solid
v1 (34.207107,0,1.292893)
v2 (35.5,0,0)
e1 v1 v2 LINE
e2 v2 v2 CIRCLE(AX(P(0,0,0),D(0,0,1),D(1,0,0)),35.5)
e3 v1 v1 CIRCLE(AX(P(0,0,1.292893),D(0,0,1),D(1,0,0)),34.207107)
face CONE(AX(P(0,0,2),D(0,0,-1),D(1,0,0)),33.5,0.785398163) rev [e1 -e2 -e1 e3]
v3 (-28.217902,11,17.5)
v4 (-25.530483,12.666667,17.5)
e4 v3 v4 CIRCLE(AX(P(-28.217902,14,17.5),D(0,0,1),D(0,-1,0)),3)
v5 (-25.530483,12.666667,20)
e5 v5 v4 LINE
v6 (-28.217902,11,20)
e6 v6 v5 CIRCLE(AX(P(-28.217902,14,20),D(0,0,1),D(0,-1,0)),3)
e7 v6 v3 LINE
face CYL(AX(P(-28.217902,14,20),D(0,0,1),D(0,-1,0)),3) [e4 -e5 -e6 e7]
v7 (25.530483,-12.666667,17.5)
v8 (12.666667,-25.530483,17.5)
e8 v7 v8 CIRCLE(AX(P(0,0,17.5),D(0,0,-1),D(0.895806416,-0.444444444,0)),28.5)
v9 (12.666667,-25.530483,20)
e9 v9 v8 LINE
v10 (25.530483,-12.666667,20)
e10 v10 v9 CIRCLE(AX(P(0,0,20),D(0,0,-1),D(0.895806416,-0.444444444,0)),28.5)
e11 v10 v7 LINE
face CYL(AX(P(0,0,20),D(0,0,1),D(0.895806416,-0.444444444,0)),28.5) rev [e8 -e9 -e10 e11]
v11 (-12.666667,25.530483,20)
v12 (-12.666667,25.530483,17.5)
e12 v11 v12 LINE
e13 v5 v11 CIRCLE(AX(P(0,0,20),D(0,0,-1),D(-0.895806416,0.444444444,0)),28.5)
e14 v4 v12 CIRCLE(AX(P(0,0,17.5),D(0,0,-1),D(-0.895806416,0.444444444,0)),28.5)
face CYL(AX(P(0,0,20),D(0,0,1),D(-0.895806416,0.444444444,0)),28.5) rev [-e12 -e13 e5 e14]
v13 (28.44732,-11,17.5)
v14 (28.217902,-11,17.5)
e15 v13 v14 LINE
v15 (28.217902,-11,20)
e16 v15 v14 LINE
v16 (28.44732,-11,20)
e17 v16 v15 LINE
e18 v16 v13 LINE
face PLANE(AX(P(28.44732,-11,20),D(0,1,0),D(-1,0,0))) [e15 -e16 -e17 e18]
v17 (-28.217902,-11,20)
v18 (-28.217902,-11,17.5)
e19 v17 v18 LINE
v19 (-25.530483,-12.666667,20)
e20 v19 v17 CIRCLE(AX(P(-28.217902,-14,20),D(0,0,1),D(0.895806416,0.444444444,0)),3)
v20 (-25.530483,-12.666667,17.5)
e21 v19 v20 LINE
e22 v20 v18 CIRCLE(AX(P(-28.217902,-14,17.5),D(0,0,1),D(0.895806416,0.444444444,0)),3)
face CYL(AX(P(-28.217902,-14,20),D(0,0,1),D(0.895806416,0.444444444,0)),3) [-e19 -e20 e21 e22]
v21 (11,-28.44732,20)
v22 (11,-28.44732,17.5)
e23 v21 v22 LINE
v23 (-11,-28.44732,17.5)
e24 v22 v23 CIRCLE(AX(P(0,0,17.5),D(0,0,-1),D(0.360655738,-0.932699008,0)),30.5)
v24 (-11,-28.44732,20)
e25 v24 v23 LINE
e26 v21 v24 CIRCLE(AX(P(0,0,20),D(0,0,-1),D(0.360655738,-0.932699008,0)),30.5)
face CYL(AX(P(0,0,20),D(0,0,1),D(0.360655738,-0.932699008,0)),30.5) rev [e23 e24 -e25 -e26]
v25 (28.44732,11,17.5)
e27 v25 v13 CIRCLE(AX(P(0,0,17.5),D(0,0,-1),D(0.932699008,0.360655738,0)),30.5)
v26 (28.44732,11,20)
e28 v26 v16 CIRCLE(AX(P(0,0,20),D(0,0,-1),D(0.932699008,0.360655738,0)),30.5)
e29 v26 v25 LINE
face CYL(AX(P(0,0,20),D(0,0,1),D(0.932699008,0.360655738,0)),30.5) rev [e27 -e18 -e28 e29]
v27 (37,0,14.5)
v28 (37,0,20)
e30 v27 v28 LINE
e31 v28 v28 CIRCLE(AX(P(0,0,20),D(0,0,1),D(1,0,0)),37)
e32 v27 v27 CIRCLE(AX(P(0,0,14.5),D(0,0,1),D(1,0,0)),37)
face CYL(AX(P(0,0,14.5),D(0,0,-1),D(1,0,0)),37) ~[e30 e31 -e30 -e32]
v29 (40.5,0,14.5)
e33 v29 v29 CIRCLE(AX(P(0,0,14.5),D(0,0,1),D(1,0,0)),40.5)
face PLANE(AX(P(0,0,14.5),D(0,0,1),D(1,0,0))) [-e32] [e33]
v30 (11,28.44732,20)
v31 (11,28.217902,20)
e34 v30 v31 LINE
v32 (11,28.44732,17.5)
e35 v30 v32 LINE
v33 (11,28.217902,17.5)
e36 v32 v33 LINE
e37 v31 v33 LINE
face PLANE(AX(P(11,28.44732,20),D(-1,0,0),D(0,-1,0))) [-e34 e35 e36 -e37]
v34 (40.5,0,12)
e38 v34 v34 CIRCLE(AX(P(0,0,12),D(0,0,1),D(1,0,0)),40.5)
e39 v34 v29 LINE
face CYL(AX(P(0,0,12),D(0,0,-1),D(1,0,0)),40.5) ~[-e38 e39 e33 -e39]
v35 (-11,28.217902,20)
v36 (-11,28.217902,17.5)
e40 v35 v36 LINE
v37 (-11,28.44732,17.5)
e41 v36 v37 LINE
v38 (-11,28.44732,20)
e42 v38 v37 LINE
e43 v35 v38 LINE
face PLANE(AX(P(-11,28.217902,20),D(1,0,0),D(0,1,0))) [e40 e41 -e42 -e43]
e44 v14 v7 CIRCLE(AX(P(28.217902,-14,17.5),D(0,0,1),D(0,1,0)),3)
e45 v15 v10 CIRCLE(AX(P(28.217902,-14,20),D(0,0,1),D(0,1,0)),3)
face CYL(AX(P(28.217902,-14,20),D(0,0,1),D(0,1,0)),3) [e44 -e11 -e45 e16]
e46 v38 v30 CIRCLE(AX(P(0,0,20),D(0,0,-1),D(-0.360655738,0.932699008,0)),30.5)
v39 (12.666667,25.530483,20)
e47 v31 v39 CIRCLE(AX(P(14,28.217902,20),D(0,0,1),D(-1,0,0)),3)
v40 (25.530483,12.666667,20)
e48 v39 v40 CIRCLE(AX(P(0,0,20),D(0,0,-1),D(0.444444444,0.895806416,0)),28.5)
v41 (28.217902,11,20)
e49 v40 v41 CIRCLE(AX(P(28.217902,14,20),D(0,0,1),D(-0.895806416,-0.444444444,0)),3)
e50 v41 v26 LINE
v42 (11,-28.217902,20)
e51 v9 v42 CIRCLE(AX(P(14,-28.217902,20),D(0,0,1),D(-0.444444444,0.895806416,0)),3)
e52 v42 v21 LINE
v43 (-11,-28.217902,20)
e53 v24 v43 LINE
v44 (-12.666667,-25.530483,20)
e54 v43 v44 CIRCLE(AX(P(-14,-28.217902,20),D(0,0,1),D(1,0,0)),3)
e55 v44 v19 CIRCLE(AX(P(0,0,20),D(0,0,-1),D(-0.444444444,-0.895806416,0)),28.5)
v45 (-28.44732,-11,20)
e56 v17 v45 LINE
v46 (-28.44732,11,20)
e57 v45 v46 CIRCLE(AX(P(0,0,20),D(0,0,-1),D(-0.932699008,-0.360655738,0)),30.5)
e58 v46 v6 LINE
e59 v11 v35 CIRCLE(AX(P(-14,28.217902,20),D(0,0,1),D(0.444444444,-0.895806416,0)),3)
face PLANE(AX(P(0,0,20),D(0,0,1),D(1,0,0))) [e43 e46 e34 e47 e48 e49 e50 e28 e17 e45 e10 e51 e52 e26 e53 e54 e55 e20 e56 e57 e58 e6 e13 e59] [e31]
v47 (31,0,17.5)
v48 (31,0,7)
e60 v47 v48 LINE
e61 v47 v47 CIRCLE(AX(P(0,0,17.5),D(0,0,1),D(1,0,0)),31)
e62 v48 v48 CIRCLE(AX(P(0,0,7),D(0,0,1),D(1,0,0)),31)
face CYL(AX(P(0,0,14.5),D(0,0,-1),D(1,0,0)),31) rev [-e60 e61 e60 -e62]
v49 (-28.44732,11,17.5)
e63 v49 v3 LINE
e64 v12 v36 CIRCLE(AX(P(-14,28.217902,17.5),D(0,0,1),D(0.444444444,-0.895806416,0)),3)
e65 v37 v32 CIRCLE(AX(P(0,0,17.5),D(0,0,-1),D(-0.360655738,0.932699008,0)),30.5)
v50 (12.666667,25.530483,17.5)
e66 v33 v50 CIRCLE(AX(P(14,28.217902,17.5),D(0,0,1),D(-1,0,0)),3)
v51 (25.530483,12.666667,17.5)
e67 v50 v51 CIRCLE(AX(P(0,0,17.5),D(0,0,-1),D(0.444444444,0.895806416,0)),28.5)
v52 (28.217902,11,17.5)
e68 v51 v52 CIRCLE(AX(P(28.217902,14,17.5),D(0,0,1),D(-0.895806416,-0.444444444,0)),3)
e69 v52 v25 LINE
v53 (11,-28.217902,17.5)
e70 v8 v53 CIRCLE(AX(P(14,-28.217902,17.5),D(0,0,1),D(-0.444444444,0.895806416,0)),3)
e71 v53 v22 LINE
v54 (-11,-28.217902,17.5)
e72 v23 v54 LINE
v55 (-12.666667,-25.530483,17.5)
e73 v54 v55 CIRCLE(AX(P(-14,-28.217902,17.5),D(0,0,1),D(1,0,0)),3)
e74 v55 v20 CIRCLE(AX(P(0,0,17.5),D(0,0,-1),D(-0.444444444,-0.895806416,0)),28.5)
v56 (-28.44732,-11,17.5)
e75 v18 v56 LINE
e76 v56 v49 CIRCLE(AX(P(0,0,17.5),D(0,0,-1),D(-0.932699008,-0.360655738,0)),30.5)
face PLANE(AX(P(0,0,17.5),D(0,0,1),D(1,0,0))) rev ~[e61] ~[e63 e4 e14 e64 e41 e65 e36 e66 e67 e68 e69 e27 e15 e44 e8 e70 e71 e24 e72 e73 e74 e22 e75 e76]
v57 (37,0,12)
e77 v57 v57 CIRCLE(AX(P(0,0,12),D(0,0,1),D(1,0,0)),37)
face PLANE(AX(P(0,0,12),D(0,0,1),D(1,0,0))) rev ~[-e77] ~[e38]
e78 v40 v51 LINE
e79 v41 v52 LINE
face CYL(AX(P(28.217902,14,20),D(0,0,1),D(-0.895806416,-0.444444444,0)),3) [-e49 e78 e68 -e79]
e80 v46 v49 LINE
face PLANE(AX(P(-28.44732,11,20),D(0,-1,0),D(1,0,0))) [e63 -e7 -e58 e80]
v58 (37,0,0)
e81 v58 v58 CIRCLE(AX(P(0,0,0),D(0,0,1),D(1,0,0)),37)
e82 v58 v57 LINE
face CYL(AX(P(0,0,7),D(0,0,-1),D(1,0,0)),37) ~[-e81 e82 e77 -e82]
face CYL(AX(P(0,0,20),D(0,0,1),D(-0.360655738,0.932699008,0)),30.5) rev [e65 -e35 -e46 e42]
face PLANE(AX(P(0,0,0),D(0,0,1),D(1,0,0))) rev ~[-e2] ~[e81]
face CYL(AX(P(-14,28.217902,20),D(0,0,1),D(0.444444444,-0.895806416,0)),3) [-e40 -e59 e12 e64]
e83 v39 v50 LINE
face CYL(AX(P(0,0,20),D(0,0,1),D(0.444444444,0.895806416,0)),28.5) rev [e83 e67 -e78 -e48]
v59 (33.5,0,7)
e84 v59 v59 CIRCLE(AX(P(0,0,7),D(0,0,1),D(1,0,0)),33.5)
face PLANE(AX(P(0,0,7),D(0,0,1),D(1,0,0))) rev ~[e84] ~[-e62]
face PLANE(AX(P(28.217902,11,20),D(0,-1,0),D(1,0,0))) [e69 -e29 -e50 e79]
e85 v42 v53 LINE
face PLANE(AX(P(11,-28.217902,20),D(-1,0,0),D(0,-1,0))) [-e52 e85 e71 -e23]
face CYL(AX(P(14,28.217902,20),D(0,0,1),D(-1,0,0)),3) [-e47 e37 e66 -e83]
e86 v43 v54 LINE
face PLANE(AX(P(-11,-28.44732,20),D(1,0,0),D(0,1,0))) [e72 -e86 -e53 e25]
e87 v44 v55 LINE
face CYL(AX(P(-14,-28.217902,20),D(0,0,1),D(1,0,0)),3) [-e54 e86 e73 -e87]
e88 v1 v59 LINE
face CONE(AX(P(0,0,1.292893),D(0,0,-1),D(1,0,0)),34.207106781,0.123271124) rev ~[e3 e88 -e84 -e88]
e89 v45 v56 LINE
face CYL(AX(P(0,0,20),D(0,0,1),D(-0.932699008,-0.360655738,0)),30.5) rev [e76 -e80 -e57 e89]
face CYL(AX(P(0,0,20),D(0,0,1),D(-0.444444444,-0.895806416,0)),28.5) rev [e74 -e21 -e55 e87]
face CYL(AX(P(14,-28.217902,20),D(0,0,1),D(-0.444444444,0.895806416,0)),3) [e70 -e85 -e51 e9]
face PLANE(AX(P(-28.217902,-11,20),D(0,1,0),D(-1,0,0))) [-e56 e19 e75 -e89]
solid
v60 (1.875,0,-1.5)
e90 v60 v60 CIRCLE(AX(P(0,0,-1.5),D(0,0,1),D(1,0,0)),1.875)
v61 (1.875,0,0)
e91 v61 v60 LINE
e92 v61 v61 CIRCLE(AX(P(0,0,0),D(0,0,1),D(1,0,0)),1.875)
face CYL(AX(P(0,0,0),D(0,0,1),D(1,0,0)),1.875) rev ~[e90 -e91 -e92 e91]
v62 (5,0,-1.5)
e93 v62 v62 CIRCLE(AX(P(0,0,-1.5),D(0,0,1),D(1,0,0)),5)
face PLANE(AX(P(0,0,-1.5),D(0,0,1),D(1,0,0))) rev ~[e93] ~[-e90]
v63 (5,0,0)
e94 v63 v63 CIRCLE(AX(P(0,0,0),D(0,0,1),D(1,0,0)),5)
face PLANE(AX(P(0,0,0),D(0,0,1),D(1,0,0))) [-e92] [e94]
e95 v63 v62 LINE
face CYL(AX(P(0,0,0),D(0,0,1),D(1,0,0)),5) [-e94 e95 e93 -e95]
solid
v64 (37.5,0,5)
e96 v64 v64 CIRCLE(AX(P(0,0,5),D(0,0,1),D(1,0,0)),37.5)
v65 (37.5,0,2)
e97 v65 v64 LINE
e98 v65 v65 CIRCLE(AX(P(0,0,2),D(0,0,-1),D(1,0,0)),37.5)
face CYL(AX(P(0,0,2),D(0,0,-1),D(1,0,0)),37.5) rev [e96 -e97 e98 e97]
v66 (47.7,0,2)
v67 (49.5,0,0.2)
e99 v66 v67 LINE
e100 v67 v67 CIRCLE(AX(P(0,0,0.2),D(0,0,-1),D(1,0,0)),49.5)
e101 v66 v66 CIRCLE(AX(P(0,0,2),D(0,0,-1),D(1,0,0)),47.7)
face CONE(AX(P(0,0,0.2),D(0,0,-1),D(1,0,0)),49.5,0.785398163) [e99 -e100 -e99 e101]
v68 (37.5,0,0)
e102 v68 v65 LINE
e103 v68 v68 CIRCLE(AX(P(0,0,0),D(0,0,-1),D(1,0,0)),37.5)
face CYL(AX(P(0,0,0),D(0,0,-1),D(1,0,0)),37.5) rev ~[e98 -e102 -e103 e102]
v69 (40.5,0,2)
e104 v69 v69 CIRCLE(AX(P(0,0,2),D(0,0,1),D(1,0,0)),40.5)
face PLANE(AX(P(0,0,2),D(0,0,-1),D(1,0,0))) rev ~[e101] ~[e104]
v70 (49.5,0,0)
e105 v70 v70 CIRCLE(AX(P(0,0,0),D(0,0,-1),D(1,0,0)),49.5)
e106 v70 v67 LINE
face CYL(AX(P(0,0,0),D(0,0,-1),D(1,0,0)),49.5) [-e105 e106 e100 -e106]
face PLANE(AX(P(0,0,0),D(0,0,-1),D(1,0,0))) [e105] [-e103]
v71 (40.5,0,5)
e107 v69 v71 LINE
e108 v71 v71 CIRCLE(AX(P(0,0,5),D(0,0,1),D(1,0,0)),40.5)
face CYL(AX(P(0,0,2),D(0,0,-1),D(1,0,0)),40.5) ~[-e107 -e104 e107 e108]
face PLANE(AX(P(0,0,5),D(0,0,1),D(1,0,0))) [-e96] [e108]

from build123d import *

# Parameters (mm, degrees)
F0_R      = 37
F0_R_2    = 33.5
F1_DEPTH  = 7
F2_R      = 37
F2_R_2    = 33.5
F2_R_3    = 31
F3_DEPTH  = 5
F4_R      = 40.5
F4_R_2    = 37
F4_R_3    = 31
F5_DEPTH  = 2.5
F6_R      = 37
F6_R_2    = 31
F7_DEPTH  = 5.5
F8_R      = 31
F9_DEPTH  = 2.5
F10_SIZE  = 2
F11_R     = 5
F11_R_2   = 1.875
F12_DEPTH = 1.5
F13_R     = 49.5
F13_R_2   = 37.5
F14_DEPTH = 2
F15_R     = 40.5
F15_R_2   = 37.5
F16_DEPTH = 3
F17_SIZE  = 1.8


# Not quite as in the source:
# - a fillet or chamfer that OpenCascade refuses, or shapes differently, is made with other operations: its cross-section is extruded or revolved along the edge and cut away or added


with BuildPart() as f1:
    # F0 (on Top) → F1 (new body)
    with BuildSketch(Plane.XY):
        Circle(F0_R)
        Circle(F0_R_2, mode=Mode.SUBTRACT)
    extrude(amount=F1_DEPTH)

    # F2 (on face) → F3 (join)
    with BuildSketch(Plane.XY.offset(7)):
        Circle(F2_R)
        Circle(F2_R_2, mode=Mode.SUBTRACT)
        Circle(F2_R_2)
        Circle(F2_R_3, mode=Mode.SUBTRACT)
    extrude(amount=F3_DEPTH)

    # F4 (on face) → F5 (join)
    with BuildSketch(Plane.XY.offset(12)):
        Circle(F4_R)
        Circle(F4_R_2, mode=Mode.SUBTRACT)
        Circle(F4_R_2)
        Circle(F4_R_3, mode=Mode.SUBTRACT)
    extrude(amount=F5_DEPTH)

    # F6 (on face) → F7 (join)
    with BuildSketch(Plane.XY.offset(14.5)):
        Circle(F6_R)
        Circle(F6_R_2, mode=Mode.SUBTRACT)
    extrude(amount=F7_DEPTH)

    # F8 (on face) → F9 (join)
    with BuildSketch(Plane.XY.offset(20)):
        Circle(F8_R)
        with BuildLine():
            ThreePointArc((-25.5304828696, 12.6666666667), (-20.1525432638, 20.1525432638), (-12.6666666667, 25.5304828696))
            ThreePointArc((-12.6666666667, 25.5304828696), (-11.4504902432, 26.636763289), (-11, 28.217902119))
            Line((-11, 28.217902119), (-11, 28.4473197331))
            ThreePointArc((-11, 28.4473197331), (0, 30.5), (11, 28.4473197331))
            Line((11, 28.4473197331), (11, 28.217902119))
            ThreePointArc((11, 28.217902119), (11.4504902432, 26.636763289), (12.6666666667, 25.5304828696))
            ThreePointArc((12.6666666667, 25.5304828696), (20.1525432638, 20.1525432638), (25.5304828696, 12.6666666667))
            ThreePointArc((25.5304828696, 12.6666666667), (26.636763289, 11.4504902432), (28.217902119, 11))
            Line((28.217902119, 11), (28.4473197331, 11))
            ThreePointArc((28.4473197331, 11), (30.5, 0), (28.4473197331, -11))
            Line((28.4473197331, -11), (28.217902119, -11))
            ThreePointArc((28.217902119, -11), (26.636763289, -11.4504902432), (25.5304828696, -12.6666666667))
            ThreePointArc((25.5304828696, -12.6666666667), (20.1525432638, -20.1525432638), (12.6666666667, -25.5304828696))
            ThreePointArc((12.6666666667, -25.5304828696), (11.4504902432, -26.636763289), (11, -28.217902119))
            Line((11, -28.217902119), (11, -28.4473197331))
            ThreePointArc((11, -28.4473197331), (0, -30.5), (-11, -28.4473197331))
            Line((-11, -28.4473197331), (-11, -28.217902119))
            ThreePointArc((-11, -28.217902119), (-11.4504902432, -26.636763289), (-12.6666666667, -25.5304828696))
            ThreePointArc((-12.6666666667, -25.5304828696), (-20.1525432638, -20.1525432638), (-25.5304828696, -12.6666666667))
            ThreePointArc((-25.5304828696, -12.6666666667), (-26.636763289, -11.4504902432), (-28.217902119, -11))
            Line((-28.217902119, -11), (-28.4473197331, -11))
            ThreePointArc((-28.4473197331, -11), (-30.5, 0), (-28.4473197331, 11))
            Line((-28.4473197331, 11), (-28.217902119, 11))
            ThreePointArc((-28.217902119, 11), (-26.636763289, 11.4504902432), (-25.5304828696, 12.6666666667))
        make_face(mode=Mode.SUBTRACT)
    extrude(amount=-F9_DEPTH)

    # F10
    f10_edges = [f1.edges().sort_by_distance(p)[0] for p in [
        (-33.5, 0, 0),
    ]]
    chamfer(f10_edges, length=F10_SIZE)

    # F18: chamfer of 5 x 1 on 1 edges, made by hand


with BuildPart() as f12:
    # F11 (on Top) → F12 (new body)
    with BuildSketch(Plane.XY):
        Circle(F11_R)
        Circle(F11_R_2, mode=Mode.SUBTRACT)
    extrude(amount=-F12_DEPTH)


with BuildPart() as f14:
    # F13 (on face) → F14 (new body)
    with BuildSketch(Plane(origin=(0, 0, 0), x_dir=(1, 0, 0), z_dir=(0, 0, -1))):
        Circle(F13_R)
        Circle(F13_R_2, mode=Mode.SUBTRACT)
    extrude(amount=-F14_DEPTH)

    # F15 (on face) → F16 (join)
    with BuildSketch(Plane.XY.offset(2)):
        Circle(F15_R)
        Circle(F15_R_2, mode=Mode.SUBTRACT)
    extrude(amount=F16_DEPTH)

    # F17
    f17_edges = [f14.edges().sort_by_distance(p)[0] for p in [
        (-49.5, 0, 2),
    ]]
    chamfer(f17_edges, length=F17_SIZE)


with BuildPart() as f18_tool2:
    # F18_s3 → F18_t4 (revolve)
    with BuildSketch(Plane.XZ):
        Polygon((34.2071067812, 1.2928932188), (33.5, 7), (33.5, 2), align=None)
    revolve(axis=Axis((0, 0, 2), (0, 0, 1)))

    split(bisect_by=Plane.XY.offset(7), keep=Keep.BOTTOM)


with BuildPart() as f1_1:
    add(f1.part)

    # F18_t1: cut F18_tool2
    add(f18_tool2.part, mode=Mode.SUBTRACT)


solid = Compound([f12.part, f14.part, f1_1.part])
